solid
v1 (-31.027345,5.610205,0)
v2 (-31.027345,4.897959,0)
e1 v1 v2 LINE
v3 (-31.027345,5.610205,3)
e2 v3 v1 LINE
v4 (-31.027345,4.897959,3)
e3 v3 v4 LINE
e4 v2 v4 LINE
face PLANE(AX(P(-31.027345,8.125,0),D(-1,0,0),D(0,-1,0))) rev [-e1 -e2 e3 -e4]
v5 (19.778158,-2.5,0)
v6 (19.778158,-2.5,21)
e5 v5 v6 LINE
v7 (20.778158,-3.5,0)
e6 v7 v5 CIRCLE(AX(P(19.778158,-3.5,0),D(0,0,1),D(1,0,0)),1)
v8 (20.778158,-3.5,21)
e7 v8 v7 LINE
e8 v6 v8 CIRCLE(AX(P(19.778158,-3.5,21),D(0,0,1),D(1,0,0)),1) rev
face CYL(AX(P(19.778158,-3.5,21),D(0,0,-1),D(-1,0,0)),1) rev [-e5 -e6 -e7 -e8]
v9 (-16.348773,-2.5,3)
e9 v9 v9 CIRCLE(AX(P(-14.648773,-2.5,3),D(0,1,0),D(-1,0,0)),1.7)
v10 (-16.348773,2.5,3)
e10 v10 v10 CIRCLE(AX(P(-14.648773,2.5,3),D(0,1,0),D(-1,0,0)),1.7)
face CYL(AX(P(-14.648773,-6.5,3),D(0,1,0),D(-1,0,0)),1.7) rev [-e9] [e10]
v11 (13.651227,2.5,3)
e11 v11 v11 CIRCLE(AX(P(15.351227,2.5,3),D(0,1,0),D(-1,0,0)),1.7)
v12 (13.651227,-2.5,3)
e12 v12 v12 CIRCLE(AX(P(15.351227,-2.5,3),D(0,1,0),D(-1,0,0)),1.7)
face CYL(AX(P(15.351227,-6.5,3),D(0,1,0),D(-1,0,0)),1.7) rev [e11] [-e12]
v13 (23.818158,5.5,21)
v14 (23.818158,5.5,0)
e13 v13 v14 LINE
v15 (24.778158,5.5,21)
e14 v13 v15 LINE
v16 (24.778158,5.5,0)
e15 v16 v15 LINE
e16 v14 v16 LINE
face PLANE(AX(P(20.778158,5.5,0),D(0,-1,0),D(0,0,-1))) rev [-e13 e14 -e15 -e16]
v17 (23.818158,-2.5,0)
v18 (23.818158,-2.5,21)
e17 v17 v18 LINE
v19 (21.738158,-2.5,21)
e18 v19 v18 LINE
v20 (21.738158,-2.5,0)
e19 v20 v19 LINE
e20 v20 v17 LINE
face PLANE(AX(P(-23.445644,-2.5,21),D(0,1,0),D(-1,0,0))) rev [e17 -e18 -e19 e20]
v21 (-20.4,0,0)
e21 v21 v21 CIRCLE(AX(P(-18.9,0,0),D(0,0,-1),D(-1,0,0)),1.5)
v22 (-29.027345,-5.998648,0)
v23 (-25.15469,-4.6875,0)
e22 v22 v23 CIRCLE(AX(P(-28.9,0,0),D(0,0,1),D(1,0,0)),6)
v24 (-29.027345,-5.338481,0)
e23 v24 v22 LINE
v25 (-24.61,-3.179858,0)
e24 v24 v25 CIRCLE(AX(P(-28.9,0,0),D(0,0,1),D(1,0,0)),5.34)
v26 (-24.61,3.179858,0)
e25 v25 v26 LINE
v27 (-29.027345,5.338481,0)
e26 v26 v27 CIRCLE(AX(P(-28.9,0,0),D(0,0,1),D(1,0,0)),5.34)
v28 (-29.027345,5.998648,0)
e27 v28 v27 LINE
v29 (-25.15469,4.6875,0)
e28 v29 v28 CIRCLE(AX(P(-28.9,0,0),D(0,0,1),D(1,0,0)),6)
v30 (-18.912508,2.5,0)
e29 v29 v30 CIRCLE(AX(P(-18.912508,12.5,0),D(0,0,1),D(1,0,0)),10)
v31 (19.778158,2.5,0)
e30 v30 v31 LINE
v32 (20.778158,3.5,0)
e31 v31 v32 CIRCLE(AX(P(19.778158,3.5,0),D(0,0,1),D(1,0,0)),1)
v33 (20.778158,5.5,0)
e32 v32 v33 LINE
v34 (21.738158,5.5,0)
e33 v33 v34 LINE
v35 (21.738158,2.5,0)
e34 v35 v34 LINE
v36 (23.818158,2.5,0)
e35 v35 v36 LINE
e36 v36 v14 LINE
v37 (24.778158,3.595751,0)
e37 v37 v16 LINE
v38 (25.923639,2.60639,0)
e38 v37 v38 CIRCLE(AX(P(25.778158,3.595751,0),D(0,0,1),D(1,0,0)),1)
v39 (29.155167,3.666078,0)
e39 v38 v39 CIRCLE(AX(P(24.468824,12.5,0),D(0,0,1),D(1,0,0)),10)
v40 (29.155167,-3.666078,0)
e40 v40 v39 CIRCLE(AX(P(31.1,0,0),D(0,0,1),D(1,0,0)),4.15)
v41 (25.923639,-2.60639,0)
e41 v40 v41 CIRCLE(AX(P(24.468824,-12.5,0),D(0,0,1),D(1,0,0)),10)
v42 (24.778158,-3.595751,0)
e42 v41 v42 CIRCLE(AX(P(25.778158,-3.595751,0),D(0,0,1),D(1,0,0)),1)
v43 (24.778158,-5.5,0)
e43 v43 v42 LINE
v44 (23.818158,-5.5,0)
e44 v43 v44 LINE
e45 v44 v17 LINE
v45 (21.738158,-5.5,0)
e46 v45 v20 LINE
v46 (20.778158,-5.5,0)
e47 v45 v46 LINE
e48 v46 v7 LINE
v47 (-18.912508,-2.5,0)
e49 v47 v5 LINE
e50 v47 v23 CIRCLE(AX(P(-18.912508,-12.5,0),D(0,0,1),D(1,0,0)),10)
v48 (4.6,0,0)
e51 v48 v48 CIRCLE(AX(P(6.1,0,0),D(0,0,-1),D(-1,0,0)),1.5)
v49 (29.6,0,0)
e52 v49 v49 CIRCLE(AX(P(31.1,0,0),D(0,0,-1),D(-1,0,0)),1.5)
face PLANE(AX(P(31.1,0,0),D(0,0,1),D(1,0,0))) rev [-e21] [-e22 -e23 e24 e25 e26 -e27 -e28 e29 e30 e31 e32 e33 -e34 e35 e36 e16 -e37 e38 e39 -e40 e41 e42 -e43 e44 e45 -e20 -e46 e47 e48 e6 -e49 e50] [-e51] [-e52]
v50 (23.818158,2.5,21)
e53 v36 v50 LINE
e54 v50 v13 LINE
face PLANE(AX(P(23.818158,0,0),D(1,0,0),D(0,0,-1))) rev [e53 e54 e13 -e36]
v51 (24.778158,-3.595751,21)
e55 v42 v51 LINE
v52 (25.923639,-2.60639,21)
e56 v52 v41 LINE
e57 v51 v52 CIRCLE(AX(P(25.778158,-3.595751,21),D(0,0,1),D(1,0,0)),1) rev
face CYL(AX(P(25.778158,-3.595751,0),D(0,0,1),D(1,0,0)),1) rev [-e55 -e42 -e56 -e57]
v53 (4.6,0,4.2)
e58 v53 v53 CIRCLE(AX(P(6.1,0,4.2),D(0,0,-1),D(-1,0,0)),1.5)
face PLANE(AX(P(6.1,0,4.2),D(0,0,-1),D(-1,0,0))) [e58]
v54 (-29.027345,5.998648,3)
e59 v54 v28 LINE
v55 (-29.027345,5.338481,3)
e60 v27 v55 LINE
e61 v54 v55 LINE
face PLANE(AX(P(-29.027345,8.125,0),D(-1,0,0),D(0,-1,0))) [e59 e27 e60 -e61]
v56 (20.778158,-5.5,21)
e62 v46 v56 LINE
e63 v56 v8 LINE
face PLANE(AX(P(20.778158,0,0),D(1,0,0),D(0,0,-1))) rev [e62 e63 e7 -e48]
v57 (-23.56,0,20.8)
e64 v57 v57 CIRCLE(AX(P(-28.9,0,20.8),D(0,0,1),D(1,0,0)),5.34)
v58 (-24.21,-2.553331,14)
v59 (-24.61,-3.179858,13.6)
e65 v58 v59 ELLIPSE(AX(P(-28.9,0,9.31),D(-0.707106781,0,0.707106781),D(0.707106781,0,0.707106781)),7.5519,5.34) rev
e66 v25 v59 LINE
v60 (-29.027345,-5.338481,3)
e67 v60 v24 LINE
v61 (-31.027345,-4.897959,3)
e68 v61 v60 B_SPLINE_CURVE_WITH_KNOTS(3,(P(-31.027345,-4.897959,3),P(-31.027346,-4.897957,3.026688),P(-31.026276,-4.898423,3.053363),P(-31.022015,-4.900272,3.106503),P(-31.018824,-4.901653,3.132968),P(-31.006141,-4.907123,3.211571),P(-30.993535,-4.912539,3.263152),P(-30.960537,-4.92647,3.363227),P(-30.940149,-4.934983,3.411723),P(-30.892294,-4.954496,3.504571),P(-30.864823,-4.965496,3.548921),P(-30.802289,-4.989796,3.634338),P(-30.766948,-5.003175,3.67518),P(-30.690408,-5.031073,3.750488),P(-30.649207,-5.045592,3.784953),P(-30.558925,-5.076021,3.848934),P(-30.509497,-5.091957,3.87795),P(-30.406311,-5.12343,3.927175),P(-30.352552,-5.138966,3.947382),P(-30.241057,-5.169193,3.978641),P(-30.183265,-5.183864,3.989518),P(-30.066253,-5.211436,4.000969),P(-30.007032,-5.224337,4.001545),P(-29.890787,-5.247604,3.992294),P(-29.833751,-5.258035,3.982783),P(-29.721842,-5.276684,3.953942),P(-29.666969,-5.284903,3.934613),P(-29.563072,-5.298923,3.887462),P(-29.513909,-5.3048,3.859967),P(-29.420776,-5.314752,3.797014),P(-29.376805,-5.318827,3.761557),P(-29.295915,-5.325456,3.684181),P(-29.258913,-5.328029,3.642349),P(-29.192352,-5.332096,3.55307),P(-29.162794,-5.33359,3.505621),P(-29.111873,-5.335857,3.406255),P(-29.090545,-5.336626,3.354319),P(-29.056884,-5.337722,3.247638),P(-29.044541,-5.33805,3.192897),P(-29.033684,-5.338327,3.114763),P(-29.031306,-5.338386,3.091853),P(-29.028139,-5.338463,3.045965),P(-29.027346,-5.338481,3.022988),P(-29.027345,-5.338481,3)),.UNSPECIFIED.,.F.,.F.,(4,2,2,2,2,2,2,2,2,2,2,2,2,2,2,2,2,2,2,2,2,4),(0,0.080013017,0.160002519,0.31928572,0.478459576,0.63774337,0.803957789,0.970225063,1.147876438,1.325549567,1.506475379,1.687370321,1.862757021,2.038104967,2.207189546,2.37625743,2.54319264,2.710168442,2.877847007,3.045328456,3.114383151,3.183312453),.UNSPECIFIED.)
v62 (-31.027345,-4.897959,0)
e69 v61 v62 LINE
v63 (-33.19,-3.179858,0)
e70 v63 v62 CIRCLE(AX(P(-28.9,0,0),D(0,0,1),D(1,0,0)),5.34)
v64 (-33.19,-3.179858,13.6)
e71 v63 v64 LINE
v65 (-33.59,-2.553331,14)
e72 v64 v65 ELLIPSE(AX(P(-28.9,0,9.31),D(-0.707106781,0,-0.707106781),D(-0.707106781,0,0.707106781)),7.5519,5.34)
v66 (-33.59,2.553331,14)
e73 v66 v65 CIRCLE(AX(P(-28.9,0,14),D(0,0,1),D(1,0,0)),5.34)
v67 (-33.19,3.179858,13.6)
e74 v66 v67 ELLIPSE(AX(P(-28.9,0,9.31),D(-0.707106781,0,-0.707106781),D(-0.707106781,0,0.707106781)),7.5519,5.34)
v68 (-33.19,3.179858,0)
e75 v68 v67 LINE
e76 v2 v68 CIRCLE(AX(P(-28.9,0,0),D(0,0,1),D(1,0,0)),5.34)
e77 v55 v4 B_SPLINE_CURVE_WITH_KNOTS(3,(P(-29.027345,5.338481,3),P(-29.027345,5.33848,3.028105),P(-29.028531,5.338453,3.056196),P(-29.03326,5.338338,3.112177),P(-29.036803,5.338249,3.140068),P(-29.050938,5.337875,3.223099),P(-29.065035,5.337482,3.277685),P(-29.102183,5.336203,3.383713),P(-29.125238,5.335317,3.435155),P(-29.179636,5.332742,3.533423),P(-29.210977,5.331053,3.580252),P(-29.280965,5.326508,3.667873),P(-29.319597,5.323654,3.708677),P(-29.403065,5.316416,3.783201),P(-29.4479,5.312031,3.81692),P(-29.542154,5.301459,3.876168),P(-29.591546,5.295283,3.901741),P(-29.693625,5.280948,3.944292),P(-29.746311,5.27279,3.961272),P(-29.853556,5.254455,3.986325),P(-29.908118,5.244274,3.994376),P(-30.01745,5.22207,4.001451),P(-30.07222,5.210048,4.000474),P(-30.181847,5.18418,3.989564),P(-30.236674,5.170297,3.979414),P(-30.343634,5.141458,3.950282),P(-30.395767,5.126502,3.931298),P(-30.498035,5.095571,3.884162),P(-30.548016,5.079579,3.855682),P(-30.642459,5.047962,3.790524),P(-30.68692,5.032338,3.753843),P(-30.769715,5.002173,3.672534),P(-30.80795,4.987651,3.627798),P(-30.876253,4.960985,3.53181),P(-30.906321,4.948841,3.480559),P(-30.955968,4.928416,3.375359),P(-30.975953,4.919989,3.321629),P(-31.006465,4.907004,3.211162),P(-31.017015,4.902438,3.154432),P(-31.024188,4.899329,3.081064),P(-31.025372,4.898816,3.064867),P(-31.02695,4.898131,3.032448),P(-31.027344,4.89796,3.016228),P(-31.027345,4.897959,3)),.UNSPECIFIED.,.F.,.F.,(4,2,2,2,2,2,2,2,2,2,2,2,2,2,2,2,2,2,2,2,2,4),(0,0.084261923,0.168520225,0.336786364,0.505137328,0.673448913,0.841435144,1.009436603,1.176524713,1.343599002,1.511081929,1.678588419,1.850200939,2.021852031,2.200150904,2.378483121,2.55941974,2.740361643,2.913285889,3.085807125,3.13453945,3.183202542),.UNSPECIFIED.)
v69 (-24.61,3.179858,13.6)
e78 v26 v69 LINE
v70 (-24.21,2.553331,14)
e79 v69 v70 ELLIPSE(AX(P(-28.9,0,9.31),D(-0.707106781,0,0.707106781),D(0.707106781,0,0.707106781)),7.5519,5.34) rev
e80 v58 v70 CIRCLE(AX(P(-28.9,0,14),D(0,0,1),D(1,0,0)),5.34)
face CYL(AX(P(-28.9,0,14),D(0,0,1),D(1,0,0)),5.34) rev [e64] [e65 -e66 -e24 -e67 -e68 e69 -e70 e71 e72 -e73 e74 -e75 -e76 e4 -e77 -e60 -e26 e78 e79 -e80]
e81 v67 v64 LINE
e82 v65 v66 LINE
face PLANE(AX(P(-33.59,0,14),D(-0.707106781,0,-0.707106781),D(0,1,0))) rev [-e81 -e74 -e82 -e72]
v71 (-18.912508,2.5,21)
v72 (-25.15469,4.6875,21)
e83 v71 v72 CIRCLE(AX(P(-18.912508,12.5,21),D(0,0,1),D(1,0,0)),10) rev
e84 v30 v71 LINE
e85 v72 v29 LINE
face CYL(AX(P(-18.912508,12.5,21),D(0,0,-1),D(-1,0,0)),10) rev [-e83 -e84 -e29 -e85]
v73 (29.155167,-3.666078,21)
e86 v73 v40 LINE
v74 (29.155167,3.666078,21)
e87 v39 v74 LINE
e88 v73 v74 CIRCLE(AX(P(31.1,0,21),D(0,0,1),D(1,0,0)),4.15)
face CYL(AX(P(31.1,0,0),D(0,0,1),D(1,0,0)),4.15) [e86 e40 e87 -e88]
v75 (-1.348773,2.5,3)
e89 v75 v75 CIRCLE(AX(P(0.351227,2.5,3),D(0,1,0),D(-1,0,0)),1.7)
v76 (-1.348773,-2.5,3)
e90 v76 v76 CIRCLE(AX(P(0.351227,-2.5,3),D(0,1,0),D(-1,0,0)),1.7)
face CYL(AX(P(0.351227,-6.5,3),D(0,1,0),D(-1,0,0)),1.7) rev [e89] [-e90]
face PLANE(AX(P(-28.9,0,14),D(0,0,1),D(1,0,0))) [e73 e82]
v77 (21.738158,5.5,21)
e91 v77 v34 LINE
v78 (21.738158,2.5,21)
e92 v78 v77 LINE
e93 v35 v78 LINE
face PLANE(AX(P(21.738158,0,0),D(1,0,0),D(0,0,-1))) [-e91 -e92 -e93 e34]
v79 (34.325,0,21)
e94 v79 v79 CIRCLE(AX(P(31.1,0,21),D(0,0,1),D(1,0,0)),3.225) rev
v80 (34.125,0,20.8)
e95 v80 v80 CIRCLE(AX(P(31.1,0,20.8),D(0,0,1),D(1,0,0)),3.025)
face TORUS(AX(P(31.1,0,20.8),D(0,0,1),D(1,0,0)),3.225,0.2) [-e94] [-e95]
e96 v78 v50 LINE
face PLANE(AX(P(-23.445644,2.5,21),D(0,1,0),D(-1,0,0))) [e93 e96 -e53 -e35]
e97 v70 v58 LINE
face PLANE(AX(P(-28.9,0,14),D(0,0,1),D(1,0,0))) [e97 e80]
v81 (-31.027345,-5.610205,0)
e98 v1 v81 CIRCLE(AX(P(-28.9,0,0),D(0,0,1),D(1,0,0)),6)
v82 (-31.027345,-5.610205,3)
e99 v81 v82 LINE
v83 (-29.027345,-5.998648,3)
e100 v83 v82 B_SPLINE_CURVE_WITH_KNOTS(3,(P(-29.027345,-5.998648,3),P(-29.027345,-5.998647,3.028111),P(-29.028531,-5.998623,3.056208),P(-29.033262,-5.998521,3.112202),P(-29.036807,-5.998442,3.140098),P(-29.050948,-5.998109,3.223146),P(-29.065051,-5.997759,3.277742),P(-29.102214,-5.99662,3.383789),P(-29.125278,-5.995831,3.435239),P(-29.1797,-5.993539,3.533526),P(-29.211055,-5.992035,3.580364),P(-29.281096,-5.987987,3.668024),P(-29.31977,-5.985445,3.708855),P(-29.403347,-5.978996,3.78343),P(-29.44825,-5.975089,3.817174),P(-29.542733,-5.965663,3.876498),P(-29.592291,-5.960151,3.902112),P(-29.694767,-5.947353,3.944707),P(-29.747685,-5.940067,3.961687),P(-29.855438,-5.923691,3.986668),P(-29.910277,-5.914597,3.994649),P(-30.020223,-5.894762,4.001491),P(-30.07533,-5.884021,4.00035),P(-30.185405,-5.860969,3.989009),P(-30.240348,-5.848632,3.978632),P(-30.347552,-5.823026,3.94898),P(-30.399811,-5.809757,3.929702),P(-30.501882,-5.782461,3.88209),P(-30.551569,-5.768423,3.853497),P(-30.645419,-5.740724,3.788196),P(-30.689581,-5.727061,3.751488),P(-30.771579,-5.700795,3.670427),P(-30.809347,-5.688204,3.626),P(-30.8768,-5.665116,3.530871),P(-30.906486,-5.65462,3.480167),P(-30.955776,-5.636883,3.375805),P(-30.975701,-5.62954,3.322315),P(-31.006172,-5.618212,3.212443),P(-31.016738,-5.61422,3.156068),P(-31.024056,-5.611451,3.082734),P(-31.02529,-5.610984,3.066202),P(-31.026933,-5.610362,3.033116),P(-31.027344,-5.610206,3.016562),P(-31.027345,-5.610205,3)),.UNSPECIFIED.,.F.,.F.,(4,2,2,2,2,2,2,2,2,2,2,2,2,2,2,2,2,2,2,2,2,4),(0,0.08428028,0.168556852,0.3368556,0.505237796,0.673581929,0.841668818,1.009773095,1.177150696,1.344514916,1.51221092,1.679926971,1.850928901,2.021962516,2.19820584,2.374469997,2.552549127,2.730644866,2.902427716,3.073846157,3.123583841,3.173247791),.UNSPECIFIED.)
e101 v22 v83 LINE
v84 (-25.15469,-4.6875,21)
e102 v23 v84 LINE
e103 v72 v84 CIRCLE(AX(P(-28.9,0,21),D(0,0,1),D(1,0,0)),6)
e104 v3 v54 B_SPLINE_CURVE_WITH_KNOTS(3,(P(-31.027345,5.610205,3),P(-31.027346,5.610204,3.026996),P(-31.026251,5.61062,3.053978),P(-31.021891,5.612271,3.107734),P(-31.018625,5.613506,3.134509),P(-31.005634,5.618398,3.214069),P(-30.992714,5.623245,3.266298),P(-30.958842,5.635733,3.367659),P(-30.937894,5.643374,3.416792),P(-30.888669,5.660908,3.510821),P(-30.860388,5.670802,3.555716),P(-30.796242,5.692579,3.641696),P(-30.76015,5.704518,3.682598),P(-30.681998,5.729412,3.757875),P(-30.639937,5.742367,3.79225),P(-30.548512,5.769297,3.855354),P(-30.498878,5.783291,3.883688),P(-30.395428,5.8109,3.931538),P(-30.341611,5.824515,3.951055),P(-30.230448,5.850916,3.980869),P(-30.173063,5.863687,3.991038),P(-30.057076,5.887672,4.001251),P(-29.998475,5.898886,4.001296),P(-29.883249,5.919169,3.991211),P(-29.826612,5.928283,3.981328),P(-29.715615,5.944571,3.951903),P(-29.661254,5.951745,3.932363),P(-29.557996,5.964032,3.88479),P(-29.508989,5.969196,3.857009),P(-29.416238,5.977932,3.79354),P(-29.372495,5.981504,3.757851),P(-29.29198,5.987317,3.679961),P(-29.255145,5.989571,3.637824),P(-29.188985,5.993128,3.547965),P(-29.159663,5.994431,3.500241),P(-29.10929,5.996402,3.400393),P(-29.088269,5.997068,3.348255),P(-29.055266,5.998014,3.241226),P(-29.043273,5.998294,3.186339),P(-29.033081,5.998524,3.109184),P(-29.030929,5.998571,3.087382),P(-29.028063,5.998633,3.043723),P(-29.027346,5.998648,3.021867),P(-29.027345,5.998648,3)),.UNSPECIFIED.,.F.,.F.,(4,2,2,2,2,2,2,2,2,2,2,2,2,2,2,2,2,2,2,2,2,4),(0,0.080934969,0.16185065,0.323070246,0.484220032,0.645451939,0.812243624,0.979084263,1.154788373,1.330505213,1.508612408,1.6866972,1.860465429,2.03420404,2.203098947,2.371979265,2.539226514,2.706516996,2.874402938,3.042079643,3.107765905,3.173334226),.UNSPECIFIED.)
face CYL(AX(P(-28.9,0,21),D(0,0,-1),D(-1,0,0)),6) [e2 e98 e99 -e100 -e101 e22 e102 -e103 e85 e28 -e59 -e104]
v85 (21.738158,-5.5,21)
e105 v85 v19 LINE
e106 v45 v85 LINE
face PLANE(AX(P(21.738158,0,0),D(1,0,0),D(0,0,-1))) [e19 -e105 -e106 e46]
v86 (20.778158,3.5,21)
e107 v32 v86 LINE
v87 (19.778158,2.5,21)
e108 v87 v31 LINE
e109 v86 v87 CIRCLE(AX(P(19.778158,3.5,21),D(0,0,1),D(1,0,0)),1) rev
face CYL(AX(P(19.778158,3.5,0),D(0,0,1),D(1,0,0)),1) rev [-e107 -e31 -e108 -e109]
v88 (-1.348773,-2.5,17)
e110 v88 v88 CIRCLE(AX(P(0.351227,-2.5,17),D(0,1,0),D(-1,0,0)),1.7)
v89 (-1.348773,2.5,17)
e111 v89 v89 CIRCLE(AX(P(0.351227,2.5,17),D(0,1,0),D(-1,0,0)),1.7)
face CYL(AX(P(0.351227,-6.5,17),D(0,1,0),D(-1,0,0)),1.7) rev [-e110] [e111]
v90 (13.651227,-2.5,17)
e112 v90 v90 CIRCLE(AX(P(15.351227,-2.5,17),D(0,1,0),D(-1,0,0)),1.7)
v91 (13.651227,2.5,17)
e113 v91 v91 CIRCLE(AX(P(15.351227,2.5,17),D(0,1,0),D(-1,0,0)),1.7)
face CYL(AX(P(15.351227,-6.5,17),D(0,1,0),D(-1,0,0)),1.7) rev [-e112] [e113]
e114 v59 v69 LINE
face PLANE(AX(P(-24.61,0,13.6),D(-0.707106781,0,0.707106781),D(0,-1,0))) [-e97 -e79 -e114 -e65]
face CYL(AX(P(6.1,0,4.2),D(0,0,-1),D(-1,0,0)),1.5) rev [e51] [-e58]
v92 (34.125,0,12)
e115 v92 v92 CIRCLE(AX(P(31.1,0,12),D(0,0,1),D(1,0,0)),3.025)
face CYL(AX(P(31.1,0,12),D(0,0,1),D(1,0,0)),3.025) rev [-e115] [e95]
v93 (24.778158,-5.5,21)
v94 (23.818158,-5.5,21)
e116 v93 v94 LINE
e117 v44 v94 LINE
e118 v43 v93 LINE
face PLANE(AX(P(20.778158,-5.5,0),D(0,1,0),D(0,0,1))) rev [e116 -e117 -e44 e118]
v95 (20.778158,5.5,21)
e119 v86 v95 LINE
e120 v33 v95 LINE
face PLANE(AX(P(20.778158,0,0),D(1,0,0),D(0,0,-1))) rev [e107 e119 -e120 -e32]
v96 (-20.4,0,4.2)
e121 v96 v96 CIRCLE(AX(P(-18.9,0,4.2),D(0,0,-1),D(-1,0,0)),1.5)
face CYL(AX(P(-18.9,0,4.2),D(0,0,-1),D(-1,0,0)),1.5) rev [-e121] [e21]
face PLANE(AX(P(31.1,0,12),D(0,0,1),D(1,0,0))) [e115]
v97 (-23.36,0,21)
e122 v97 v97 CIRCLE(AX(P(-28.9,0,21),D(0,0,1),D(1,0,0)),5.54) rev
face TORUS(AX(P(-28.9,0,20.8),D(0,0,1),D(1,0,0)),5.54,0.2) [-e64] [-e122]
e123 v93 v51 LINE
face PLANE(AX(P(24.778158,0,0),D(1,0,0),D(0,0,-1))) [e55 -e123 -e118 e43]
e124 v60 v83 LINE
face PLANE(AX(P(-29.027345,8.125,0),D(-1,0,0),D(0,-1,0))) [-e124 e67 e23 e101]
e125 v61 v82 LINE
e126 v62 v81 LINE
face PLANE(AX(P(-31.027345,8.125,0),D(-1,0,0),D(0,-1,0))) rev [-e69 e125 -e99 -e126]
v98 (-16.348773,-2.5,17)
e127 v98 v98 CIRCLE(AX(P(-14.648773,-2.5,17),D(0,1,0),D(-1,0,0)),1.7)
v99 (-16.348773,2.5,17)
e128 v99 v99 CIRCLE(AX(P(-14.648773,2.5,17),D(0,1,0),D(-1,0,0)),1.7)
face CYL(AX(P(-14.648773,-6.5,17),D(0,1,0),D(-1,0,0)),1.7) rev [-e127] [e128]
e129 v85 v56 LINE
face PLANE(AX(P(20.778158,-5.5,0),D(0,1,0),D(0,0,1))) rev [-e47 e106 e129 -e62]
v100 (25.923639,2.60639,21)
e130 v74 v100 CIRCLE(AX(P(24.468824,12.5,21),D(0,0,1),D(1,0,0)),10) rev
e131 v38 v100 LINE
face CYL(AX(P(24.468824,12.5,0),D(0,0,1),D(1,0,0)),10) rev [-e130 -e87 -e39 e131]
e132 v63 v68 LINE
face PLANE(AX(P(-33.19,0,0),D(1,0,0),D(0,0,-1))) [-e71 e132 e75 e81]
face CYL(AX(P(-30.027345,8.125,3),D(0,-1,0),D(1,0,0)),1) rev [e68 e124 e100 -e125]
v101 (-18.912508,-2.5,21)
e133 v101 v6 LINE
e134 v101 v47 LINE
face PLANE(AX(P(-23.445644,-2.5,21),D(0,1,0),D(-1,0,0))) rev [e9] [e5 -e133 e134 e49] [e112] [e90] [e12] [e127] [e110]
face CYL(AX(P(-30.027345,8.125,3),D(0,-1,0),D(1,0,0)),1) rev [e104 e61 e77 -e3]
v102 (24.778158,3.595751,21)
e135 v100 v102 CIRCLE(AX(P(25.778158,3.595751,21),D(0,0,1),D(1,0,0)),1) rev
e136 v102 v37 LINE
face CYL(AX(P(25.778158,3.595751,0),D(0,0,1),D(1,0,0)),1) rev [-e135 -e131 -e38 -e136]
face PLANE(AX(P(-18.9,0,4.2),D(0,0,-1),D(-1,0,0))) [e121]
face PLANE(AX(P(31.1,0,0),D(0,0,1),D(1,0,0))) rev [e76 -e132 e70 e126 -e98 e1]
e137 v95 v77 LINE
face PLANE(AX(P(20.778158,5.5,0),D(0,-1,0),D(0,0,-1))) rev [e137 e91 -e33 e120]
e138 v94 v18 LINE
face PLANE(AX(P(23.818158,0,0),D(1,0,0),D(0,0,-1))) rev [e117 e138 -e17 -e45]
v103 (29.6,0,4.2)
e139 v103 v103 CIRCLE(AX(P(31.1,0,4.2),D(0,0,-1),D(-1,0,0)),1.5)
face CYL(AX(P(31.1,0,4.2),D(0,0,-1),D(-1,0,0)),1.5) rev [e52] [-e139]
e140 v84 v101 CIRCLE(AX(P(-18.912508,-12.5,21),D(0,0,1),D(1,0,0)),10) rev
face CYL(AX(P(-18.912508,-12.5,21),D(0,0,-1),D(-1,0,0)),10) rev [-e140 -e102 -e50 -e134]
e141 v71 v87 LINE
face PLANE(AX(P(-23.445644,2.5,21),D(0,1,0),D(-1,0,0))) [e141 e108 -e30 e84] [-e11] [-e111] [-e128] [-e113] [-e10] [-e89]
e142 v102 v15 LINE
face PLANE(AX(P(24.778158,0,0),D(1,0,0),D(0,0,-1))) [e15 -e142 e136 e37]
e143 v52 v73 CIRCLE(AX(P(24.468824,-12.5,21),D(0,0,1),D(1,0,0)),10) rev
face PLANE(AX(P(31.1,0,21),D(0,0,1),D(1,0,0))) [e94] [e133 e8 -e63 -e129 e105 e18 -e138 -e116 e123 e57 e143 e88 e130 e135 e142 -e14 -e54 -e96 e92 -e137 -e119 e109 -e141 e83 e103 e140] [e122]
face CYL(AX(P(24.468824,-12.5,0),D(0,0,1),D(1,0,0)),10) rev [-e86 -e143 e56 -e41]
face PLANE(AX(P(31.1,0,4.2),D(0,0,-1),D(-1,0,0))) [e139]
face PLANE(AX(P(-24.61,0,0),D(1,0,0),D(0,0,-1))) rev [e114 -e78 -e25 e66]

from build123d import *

# Parameters (mm, degrees)
BOSS_EXTRUDE1_DEPTH = 21
SKETCH2_R           = 5.34
CUT_EXTRUDE1_DEPTH  = 7
CUT_EXTRUDE2_DEPTH  = 39.078996836
CHAMFER1_SIZE       = 0.4
FILLET1_R           = 10
SKETCH4_R           = 1
CUT_EXTRUDE3_DEPTH  = 8.125
SKETCH6_R           = 4.15
BOSS_EXTRUDE2_DEPTH = 21
FILLET2_R           = 10
SKETCH5_R           = 1.5
CUT_EXTRUDE5_DEPTH  = 4.2
SKETCH7_R           = 3.025
CUT_EXTRUDE6_DEPTH  = 9
FILLET3_R           = 0.2
SKETCH8_W           = 0.96
SKETCH8_H           = 4
BOSS_EXTRUDE3_DEPTH = 21
FILLET4_R           = 1
SKETCH10_R          = 1.7
CUT_EXTRUDE7_DEPTH  = 43.006695945
SKETCH12_W          = 4
SKETCH12_H          = 1
CUT_EXTRUDE8_DEPTH  = 42.542899564


with BuildPart() as part:
    # Sketch1 → Boss-Extrude1 (new body)
    with BuildSketch(Plane.XY):
        with BuildLine():
            Line((-23.445643943, -2.5), (31.1, -2.5))
            ThreePointArc((31.1, -2.5), (33.6, 0), (31.1, 2.5))
            Line((31.1, 2.5), (-23.445643943, 2.5))
            ThreePointArc((-23.445643943, 2.5), (-34.9, 0), (-23.445643943, -2.5))
        make_face()
    extrude(amount=BOSS_EXTRUDE1_DEPTH)

    # Sketch2 → Cut-Extrude1 (cut)
    with BuildSketch(Plane.XY.offset(21)):
        with Locations((-28.9, 0)):
            Circle(SKETCH2_R)
    extrude(amount=-CUT_EXTRUDE1_DEPTH, mode=Mode.SUBTRACT)

    # Sketch3 → Cut-Extrude2 (cut, through all)
    with BuildSketch(Plane.XY.offset(14)):
        with BuildLine():
            Line((-33.19, 3.179858487), (-33.19, -3.179858487))
            ThreePointArc((-33.19, -3.179858487), (-28.9, -5.34), (-24.61, -3.179858487))
            Line((-24.61, -3.179858487), (-24.61, 3.179858487))
            ThreePointArc((-24.61, 3.179858487), (-28.9, 5.34), (-33.19, 3.179858487))
        make_face()
    extrude(amount=-CUT_EXTRUDE2_DEPTH, mode=Mode.SUBTRACT)

    # Chamfer1
    # the kernel refuses this chamfer: 0.4 mm, written as the material it takes off along each edge
    with BuildSketch(Plane(origin=(-24.61, -4.208531683, 14), x_dir=(-0.027495876610587302, 0, -0.9996219169112966), z_dir=(0, 1, 0))) as chamfer1_piece_1_section:
        Polygon((CHAMFER1_SIZE * 0.999621916911, -CHAMFER1_SIZE * 0.0274958766106), (-CHAMFER1_SIZE * 0.0274958766106, -CHAMFER1_SIZE * 0.999621916911), (0, 0), align=None)
    chamfer1_piece_1 = extrude(amount=8.417063365, mode=Mode.PRIVATE)
    chamfer1_piece_1 = chamfer1_piece_1 & Plane(origin=(-28.9, 0, 13.865333272), x_dir=(0.803370786516886, 0.595479117493838, 0), z_dir=(0, 0, 1)) * Cylinder(5.34, 19, mode=Mode.PRIVATE)
    add(chamfer1_piece_1, mode=Mode.SUBTRACT)
    with BuildSketch(Plane(origin=(-33.19, 4.208531683, 14), x_dir=(0.027495876610578673, 0, -0.999621916911297), z_dir=(0, -1, 0))) as chamfer1_piece_2_section:
        Polygon((CHAMFER1_SIZE * 0.999621916911, -CHAMFER1_SIZE * 0.0274958766106), (-CHAMFER1_SIZE * 0.0274958766106, -CHAMFER1_SIZE * 0.999621916911), (0, 0), align=None)
    chamfer1_piece_2 = extrude(amount=8.417063365, mode=Mode.PRIVATE)
    chamfer1_piece_2 = chamfer1_piece_2 & Plane(origin=(-28.9, 0, 13.865333272), x_dir=(0.803370786516886, 0.595479117493838, 0), z_dir=(0, 0, 1)) * Cylinder(5.34, 19, mode=Mode.PRIVATE)
    add(chamfer1_piece_2, mode=Mode.SUBTRACT)

    # Fillet1
    fillet1_edges = [part.edges().sort_by_distance(p)[0] for p in [
        (-23.445643943, 2.5, 10.5),
        (-23.445643943, -2.5, 10.5),
    ]]
    fillet(fillet1_edges, radius=FILLET1_R)

    # Sketch4 → Cut-Extrude3 (cut, symmetric)
    with BuildSketch(Plane(origin=(0, 0, 0), x_dir=(1, 0, 0), z_dir=(0, 1, 0))):
        with Locations((-30.027345217, -3)):
            Circle(SKETCH4_R)
        with BuildLine():
            ThreePointArc((-31.027345217, -3), (-30.027345217, -2), (-29.027345217, -3))
            Line((-29.027345217, -3), (-29.027345217, 4))
            Line((-29.027345217, 4), (-31.027345217, 4))
            Line((-31.027345217, 4), (-31.027345217, -3))
        make_face()
    extrude(amount=CUT_EXTRUDE3_DEPTH, both=True, mode=Mode.SUBTRACT)

    # Sketch6 → Boss-Extrude2 (add, through all)
    with BuildSketch(Plane.XY.offset(21)):
        with Locations((31.1, 0)):
            Circle(SKETCH6_R)
    extrude(amount=-BOSS_EXTRUDE2_DEPTH)

    # Fillet2
    fillet2_edges = [part.edges().sort_by_distance(p)[0] for p in [
        (27.787523585, 2.5, 10.5),
        (27.787523585, -2.5, 10.5),
    ]]
    fillet(fillet2_edges, radius=FILLET2_R)

    # Sketch5 → Cut-Extrude5 (cut)
    with BuildSketch(Plane(origin=(0, 0, 0), x_dir=(-1, 0, 0), z_dir=(0, 0, -1))):
        with Locations((-31.1, 0)):
            Circle(SKETCH5_R)
        with Locations((-6.1, 0)):
            Circle(SKETCH5_R)
        with Locations((18.9, 0)):
            Circle(SKETCH5_R)
    extrude(amount=-CUT_EXTRUDE5_DEPTH, mode=Mode.SUBTRACT)

    # Sketch7 → Cut-Extrude6 (cut)
    with BuildSketch(Plane.XY.offset(21)):
        with Locations((31.1, 0)):
            Circle(SKETCH7_R)
    extrude(amount=-CUT_EXTRUDE6_DEPTH, mode=Mode.SUBTRACT)

    # Fillet3
    fillet3_edges = [part.edges().sort_by_distance(p)[0] for p in [
        (28.075, 0, 21),
        (-34.24, 0, 21),
    ]]
    fillet(fillet3_edges, radius=FILLET3_R)

    # Sketch8 → Boss-Extrude3 (add, through all)
    with BuildSketch(Plane.XY.offset(21)):
        with Locations((21.258157906, 4.5)):
            Rectangle(SKETCH8_W, SKETCH8_H)
        with Locations((24.298157906, 4.5)):
            Rectangle(SKETCH8_W, SKETCH8_H)
        with Locations((21.258157906, -4.5)):
            Rectangle(SKETCH8_W, SKETCH8_H)
        with Locations((24.298157906, -4.5)):
            Rectangle(SKETCH8_W, SKETCH8_H)
    extrude(amount=-BOSS_EXTRUDE3_DEPTH)

    # Fillet4
    fillet4_edges = [part.edges().sort_by_distance(p)[0] for p in [
        (20.778157906, 2.5, 10.5),
        (24.778157906, 2.50478553, 10.5),
        (20.778157906, -2.5, 10.5),
        (24.778157906, -2.50478553, 10.5),
    ]]
    fillet(fillet4_edges, radius=FILLET4_R)

    # Sketch10 → Cut-Extrude7 (cut, through all)
    with BuildSketch(Plane(origin=(0, 2.5, 0), x_dir=(1, 0, 0), z_dir=(0, 1, 0))):
        with Locations(Location((-14.648773097, -17, 0), (0, 0, 180))):
            Circle(SKETCH10_R)
        with Locations(Location((0.351226903, -17, 0), (0, 0, 180))):
            Circle(SKETCH10_R)
        with Locations(Location((15.351226903, -17, 0), (0, 0, 180))):
            Circle(SKETCH10_R)
        with Locations(Location((0.351226903, -3, 0), (0, 0, 180))):
            Circle(SKETCH10_R)
        with Locations(Location((15.351226903, -3, 0), (0, 0, 180))):
            Circle(SKETCH10_R)
        with Locations(Location((-14.648773097, -3, 0), (0, 0, 180))):
            Circle(SKETCH10_R)
    extrude(amount=-CUT_EXTRUDE7_DEPTH, mode=Mode.SUBTRACT)

    # Sketch12 → Cut-Extrude8 (cut, through all)
    with BuildSketch(Plane.XY.offset(21)):
        with Locations((22.778157906, 6)):
            Rectangle(SKETCH12_W, SKETCH12_H)
        with Locations((22.778157906, -6)):
            Rectangle(SKETCH12_W, SKETCH12_H)
    extrude(amount=-CUT_EXTRUDE8_DEPTH, mode=Mode.SUBTRACT)


solid = part.part
